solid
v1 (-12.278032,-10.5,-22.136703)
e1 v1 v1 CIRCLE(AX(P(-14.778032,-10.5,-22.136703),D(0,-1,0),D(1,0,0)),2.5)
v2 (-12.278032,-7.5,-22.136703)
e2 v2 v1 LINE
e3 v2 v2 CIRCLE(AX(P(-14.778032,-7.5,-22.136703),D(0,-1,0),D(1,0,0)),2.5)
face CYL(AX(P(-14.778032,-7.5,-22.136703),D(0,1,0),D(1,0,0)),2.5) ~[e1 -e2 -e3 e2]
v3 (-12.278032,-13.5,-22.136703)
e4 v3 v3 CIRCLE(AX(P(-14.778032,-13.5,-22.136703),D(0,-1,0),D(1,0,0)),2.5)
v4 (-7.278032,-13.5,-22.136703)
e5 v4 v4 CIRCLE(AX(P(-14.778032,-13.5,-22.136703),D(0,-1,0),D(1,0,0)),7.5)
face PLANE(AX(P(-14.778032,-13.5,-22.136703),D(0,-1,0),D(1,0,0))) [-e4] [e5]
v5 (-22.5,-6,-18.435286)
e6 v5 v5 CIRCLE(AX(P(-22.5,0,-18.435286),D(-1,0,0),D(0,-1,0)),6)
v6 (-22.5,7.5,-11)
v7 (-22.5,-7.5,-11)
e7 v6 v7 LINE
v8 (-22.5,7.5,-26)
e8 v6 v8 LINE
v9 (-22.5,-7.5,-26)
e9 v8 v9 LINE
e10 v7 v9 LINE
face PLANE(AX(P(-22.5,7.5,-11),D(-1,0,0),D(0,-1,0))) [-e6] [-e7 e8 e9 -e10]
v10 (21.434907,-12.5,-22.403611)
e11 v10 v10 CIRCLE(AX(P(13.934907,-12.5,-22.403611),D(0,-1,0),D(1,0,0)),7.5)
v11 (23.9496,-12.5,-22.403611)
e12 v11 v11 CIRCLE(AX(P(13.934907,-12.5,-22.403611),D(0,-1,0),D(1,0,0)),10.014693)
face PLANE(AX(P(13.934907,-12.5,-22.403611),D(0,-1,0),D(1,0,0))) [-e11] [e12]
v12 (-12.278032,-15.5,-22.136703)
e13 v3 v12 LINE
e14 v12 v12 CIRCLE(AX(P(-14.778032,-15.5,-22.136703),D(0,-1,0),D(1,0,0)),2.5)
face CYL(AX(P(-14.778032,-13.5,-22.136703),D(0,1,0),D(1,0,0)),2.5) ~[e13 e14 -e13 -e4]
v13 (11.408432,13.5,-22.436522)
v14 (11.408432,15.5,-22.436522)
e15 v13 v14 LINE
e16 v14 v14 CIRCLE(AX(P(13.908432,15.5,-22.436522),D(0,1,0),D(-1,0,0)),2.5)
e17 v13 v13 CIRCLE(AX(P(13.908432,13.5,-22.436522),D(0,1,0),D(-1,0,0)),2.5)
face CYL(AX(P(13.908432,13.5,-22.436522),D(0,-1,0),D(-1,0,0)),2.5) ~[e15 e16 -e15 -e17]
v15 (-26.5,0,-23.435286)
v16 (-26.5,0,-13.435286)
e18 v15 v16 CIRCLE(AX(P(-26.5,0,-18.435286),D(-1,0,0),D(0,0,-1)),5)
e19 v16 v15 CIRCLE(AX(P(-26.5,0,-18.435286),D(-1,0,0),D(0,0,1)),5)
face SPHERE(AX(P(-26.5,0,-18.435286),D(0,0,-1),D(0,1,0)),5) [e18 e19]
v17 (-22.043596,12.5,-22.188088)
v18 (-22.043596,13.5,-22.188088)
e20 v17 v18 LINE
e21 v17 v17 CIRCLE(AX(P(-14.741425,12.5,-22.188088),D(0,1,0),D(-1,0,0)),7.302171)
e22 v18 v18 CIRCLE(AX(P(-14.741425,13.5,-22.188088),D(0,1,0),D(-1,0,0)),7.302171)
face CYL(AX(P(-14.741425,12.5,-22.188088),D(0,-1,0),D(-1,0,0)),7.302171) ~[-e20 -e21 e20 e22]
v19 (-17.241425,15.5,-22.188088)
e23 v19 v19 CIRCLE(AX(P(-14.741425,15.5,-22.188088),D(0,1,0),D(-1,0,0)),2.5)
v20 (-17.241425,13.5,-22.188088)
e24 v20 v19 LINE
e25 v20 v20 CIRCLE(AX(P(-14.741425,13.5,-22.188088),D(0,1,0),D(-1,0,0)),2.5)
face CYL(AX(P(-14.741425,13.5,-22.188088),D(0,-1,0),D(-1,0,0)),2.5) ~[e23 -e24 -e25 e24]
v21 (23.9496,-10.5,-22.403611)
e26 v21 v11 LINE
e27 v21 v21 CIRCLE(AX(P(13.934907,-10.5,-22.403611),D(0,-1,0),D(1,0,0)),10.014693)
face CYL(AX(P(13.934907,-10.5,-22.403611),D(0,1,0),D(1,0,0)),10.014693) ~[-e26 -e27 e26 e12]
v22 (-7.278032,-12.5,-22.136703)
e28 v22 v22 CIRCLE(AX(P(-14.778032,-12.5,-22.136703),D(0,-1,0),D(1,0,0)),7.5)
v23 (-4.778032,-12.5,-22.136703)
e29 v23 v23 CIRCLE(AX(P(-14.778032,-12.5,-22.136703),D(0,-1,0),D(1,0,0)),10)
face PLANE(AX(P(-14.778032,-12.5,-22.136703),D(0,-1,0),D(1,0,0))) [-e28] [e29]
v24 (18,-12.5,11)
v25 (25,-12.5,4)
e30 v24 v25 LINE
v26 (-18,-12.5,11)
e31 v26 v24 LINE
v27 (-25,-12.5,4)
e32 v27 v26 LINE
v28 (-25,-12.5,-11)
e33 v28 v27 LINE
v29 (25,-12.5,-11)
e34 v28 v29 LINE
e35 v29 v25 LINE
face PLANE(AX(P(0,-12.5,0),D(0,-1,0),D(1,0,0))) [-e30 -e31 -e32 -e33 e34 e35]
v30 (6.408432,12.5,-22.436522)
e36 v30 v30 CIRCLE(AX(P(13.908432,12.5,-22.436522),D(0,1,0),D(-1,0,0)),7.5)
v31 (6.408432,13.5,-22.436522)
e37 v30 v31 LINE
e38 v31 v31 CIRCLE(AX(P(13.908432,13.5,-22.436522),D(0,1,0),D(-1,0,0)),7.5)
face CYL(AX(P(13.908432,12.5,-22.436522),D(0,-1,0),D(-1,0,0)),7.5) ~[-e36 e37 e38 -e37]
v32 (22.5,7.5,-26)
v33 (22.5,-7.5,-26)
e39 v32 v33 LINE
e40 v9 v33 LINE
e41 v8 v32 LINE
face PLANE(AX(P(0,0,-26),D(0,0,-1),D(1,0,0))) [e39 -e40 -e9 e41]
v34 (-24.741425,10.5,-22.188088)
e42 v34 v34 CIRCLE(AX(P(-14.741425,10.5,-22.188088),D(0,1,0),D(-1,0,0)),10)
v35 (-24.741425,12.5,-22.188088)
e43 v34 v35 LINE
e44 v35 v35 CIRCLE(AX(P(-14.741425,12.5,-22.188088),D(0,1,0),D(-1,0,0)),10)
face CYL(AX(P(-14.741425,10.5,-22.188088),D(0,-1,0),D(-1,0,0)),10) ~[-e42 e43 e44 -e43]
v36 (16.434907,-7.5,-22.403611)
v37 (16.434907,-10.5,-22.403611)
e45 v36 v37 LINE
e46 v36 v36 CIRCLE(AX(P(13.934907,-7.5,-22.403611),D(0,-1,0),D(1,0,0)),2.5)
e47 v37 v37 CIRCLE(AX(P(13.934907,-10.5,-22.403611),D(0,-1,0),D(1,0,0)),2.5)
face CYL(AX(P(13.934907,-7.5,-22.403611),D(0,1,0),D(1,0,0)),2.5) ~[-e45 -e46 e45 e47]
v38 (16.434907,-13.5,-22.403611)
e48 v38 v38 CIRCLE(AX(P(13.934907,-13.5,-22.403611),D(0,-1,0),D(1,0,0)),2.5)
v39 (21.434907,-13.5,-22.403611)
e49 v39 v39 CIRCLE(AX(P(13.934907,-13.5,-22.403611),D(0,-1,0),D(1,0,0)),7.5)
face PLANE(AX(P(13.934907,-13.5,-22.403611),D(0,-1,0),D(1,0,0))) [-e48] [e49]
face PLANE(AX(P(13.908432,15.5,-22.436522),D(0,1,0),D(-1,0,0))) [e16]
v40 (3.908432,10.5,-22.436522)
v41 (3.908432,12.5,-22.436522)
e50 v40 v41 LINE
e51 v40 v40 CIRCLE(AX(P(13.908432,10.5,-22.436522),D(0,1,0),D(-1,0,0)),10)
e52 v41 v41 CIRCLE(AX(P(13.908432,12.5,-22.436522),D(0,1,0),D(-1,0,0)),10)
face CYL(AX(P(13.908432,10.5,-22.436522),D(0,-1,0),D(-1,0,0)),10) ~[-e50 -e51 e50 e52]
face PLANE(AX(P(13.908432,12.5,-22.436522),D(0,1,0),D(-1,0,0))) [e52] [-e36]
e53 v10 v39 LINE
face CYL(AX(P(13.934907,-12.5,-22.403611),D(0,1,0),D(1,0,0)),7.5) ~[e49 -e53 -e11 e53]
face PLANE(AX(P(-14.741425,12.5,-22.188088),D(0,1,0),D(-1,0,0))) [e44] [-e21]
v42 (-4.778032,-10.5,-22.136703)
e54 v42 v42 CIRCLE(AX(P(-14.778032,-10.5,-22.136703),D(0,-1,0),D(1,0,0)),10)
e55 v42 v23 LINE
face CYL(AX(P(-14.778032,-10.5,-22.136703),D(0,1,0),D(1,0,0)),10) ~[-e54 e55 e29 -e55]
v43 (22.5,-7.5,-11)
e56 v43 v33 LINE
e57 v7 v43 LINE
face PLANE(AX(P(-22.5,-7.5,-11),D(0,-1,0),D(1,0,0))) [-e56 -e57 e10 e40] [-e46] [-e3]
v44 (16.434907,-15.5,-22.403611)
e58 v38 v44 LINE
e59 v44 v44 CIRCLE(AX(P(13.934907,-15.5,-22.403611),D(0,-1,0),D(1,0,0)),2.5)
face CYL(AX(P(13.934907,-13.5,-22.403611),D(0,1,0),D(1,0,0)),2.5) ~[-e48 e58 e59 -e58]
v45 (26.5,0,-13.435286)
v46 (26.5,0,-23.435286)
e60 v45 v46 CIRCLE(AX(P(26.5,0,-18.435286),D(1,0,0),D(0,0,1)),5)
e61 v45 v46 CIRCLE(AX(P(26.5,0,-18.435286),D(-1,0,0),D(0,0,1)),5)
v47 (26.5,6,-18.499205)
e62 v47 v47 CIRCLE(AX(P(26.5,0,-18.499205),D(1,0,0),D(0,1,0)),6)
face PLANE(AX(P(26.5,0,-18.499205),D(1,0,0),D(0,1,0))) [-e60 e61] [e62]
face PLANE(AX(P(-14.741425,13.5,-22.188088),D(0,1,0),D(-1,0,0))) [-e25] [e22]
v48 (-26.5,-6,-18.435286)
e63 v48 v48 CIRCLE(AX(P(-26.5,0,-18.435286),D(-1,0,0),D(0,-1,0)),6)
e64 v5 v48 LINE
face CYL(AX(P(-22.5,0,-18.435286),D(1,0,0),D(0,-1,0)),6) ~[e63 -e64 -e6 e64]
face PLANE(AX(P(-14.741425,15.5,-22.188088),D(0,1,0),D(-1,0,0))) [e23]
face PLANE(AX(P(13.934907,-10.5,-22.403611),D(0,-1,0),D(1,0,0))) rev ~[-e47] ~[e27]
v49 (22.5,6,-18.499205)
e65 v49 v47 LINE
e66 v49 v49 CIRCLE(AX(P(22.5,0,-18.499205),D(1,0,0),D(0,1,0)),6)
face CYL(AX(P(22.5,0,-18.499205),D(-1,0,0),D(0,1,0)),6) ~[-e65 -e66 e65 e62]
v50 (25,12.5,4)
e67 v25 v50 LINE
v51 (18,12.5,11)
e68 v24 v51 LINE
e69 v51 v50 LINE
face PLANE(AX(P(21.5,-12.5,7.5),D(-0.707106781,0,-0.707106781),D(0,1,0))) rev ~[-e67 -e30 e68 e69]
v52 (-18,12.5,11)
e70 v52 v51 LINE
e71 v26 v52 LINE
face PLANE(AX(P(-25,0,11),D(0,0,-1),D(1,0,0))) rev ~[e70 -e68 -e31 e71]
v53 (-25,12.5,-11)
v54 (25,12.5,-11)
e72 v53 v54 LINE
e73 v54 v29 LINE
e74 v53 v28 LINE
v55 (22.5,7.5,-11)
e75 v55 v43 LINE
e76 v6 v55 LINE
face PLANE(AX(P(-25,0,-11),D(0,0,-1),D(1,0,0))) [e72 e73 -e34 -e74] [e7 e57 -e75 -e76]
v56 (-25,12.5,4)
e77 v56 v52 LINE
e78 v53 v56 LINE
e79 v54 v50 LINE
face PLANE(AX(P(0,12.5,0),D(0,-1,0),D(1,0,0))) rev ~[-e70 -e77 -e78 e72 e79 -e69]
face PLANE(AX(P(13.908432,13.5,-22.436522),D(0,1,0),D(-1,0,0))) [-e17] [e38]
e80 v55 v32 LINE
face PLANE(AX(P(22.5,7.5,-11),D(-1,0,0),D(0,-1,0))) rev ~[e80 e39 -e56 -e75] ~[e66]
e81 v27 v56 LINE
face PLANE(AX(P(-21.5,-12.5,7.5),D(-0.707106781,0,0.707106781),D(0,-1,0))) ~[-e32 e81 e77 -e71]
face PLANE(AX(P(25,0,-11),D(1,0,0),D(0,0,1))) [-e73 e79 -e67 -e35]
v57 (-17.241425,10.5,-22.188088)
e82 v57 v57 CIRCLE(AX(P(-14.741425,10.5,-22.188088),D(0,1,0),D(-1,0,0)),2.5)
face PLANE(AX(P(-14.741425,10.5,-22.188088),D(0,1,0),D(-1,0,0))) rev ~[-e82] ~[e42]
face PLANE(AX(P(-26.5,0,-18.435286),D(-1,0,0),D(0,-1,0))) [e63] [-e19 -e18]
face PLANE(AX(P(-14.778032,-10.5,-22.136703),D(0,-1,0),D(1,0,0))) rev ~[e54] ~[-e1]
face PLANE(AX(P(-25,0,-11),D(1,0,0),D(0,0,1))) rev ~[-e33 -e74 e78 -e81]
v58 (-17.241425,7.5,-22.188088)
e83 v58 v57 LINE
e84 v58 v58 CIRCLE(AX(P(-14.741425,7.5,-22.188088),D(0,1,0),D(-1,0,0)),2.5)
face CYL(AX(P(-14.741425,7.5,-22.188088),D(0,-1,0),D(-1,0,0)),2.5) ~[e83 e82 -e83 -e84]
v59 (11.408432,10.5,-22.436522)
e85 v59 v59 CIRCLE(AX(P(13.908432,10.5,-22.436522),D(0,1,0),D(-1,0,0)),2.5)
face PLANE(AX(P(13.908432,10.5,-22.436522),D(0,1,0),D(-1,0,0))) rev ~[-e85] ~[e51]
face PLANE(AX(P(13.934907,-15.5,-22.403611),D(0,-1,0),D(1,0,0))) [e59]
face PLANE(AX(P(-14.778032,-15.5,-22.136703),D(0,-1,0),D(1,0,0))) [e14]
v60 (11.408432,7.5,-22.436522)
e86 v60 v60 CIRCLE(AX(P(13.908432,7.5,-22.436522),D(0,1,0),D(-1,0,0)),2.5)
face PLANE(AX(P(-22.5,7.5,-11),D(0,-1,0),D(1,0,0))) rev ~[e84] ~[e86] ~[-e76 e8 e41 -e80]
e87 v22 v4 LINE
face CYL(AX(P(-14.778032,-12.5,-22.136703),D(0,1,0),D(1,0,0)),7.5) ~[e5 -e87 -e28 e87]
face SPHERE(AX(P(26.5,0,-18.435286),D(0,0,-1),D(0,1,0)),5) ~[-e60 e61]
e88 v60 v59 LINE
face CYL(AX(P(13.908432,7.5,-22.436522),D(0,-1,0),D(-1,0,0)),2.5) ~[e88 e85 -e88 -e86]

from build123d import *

# Parameters (mm, degrees)
F0_W      = 50
F0_H      = 22
F1_DEPTH  = 12.5
F2_W      = 45
F2_H      = 15
F3_DEPTH  = 15
F4_R      = 2.5
F5_DEPTH  = 3
F6_R      = 2.5
F7_DEPTH  = 3
F8_R      = 2.5
F9_DEPTH  = 3
F10_R     = 2.5
F11_DEPTH = 3
F12_R     = 10
F13_DEPTH = 2
F14_R     = 10
F15_DEPTH = 2
F16_R     = 10
F17_DEPTH = 2
F18_R     = 10.0146932226
F19_DEPTH = 2
F20_R     = 7.5
F21_DEPTH = 1
F22_R     = 7.5
F23_DEPTH = 1
F24_R     = 7.5
F25_DEPTH = 1
F26_R     = 7.3021705666
F27_DEPTH = 1
F28_R     = 2.5
F29_DEPTH = 2
F30_R     = 2.5
F31_DEPTH = 2
F32_R     = 2.5
F33_DEPTH = 2
F34_R     = 2.5
F35_DEPTH = 2
F36_R     = 6
F37_DEPTH = 4
F38_R     = 6
F39_DEPTH = 4
F42_SIZE  = 7
F43_SIZE  = 7


# Not quite as in the source:
# - a pattern or mirror of a feature is missing from the dataset's text; its kind, count and spacing are read off the source's solid


with BuildPart() as f1:
    # F0 (on Front) → F1 (new body, symmetric)
    with BuildSketch(Plane.XZ):
        Rectangle(F0_W, F0_H)
    extrude(amount=F1_DEPTH, both=True)

    # F2 (on face) → F3 (join)
    with BuildSketch(Plane(origin=(0, 0, -11), x_dir=(1, 0, 0), z_dir=(0, 0, -1))):
        Rectangle(F2_W, F2_H)
    extrude(amount=F3_DEPTH)

    # F4 (on face) → F5 (join)
    with BuildSketch(Plane.XZ.offset(7.5)):
        with Locations((13.9349065721, -22.4036108702)):
            Circle(F4_R)
    extrude(amount=F5_DEPTH)

    # F6 (on face) → F7 (join)
    with BuildSketch(Plane.XZ.offset(7.5)):
        with Locations((-14.7780319676, -22.1367031336)):
            Circle(F6_R)
    extrude(amount=F7_DEPTH)

    # F8 (on face) → F9 (join)
    with BuildSketch(Plane(origin=(0, 7.5, 0), x_dir=(-1, 0, 0), z_dir=(0, 1, 0))):
        with Locations((14.7414254025, -22.1880879253)):
            Circle(F8_R)
    extrude(amount=F9_DEPTH)

    # F10 (on face) → F11 (join)
    with BuildSketch(Plane(origin=(0, 7.5, 0), x_dir=(-1, 0, 0), z_dir=(0, 1, 0))):
        with Locations((-13.9084318653, -22.4365219474)):
            Circle(F10_R)
    extrude(amount=F11_DEPTH)

    # F12 (on face) → F13 (join)
    with BuildSketch(Plane(origin=(0, 10.5, 0), x_dir=(-1, 0, 0), z_dir=(0, 1, 0))):
        with Locations((-13.9084318653, -22.4365219474)):
            Circle(F12_R)
    extrude(amount=F13_DEPTH)

    # F14 (on face) → F15 (join)
    with BuildSketch(Plane(origin=(0, 10.5, 0), x_dir=(-1, 0, 0), z_dir=(0, 1, 0))):
        with Locations((14.7414254025, -22.1880879253)):
            Circle(F14_R)
    extrude(amount=F15_DEPTH)

    # F16 (on face) → F17 (join)
    with BuildSketch(Plane.XZ.offset(10.5)):
        with Locations((-14.7780319676, -22.1367031336)):
            Circle(F16_R)
    extrude(amount=F17_DEPTH)

    # F18 (on face) → F19 (join)
    with BuildSketch(Plane.XZ.offset(10.5)):
        with Locations((13.9349065721, -22.4036108702)):
            Circle(F18_R)
    extrude(amount=F19_DEPTH)

    # F20 (on face) → F21 (join)
    with BuildSketch(Plane.XZ.offset(12.5)):
        with Locations((-14.7780319676, -22.1367031336)):
            Circle(F20_R)
    extrude(amount=F21_DEPTH)

    # F22 (on face) → F23 (join)
    with BuildSketch(Plane.XZ.offset(12.5)):
        with Locations((13.9349065721, -22.4036108702)):
            Circle(F22_R)
    extrude(amount=F23_DEPTH)

    # F24 (on face) → F25 (join)
    with BuildSketch(Plane(origin=(0, 12.5, 0), x_dir=(-1, 0, 0), z_dir=(0, 1, 0))):
        with Locations((-13.9084318653, -22.4365219474)):
            Circle(F24_R)
    extrude(amount=F25_DEPTH)

    # F26 (on face) → F27 (join)
    with BuildSketch(Plane(origin=(0, 12.5, 0), x_dir=(-1, 0, 0), z_dir=(0, 1, 0))):
        with Locations((14.7414254025, -22.1880879253)):
            Circle(F26_R)
    extrude(amount=F27_DEPTH)

    # F28 (on face) → F29 (join)
    with BuildSketch(Plane(origin=(0, 13.5, 0), x_dir=(-1, 0, 0), z_dir=(0, 1, 0))):
        with Locations((-13.9084318653, -22.4365219474)):
            Circle(F28_R)
    extrude(amount=F29_DEPTH)

    # F30 (on face) → F31 (join)
    with BuildSketch(Plane(origin=(0, 13.5, 0), x_dir=(-1, 0, 0), z_dir=(0, 1, 0))):
        with Locations((14.7414254025, -22.1880879253)):
            Circle(F30_R)
    extrude(amount=F31_DEPTH)

    # F32 (on face) → F33 (join)
    with BuildSketch(Plane.XZ.offset(13.5)):
        with Locations((-14.7780319676, -22.1367031336)):
            Circle(F32_R)
    extrude(amount=F33_DEPTH)

    # F34 (on face) → F35 (join)
    with BuildSketch(Plane.XZ.offset(13.5)):
        with Locations((13.9349065721, -22.4036108702)):
            Circle(F34_R)
    extrude(amount=F35_DEPTH)

    # F36 (on face) → F37 (join)
    with BuildSketch(Plane(origin=(-22.5, 0, 0), x_dir=(0, -1, 0), z_dir=(-1, 0, 0))):
        with Locations((0, -18.4352861294)):
            Circle(F36_R)
    extrude(amount=F37_DEPTH)

    # F38 (on face) → F39 (join)
    with BuildSketch(Plane.YZ.offset(22.5)):
        with Locations((0, -18.4992050543)):
            Circle(F38_R)
    extrude(amount=F39_DEPTH)

    # F40 (on face) → F41 (revolve)
    with BuildSketch(Plane(origin=(-26.5, 0, 0), x_dir=(0, -1, 0), z_dir=(-1, 0, 0))):
        with BuildLine():
            Line((0, -23.4352861294), (0, -13.4352861294))
            ThreePointArc((0, -13.4352861294), (-5, -18.4352861294), (0, -23.4352861294))
        make_face()
    f41 = revolve(axis=Axis((-26.5, 0, -18.4352861294), (0, 0, -1)))

    # F41_copies: F41 across plane
    add(f41.mirror(Plane(origin=(0, 0, 0), x_dir=(0, 0, 1), z_dir=(1, 0, 0))))

    # F42
    f42_edges = [f1.edges().sort_by_distance(p)[0] for p in [
        (-25, 0, 11),
    ]]
    chamfer(f42_edges, length=F42_SIZE)

    # F43
    f43_edges = [f1.edges().sort_by_distance(p)[0] for p in [
        (25, 0, 11),
    ]]
    chamfer(f43_edges, length=F43_SIZE)


solid = f1.part
